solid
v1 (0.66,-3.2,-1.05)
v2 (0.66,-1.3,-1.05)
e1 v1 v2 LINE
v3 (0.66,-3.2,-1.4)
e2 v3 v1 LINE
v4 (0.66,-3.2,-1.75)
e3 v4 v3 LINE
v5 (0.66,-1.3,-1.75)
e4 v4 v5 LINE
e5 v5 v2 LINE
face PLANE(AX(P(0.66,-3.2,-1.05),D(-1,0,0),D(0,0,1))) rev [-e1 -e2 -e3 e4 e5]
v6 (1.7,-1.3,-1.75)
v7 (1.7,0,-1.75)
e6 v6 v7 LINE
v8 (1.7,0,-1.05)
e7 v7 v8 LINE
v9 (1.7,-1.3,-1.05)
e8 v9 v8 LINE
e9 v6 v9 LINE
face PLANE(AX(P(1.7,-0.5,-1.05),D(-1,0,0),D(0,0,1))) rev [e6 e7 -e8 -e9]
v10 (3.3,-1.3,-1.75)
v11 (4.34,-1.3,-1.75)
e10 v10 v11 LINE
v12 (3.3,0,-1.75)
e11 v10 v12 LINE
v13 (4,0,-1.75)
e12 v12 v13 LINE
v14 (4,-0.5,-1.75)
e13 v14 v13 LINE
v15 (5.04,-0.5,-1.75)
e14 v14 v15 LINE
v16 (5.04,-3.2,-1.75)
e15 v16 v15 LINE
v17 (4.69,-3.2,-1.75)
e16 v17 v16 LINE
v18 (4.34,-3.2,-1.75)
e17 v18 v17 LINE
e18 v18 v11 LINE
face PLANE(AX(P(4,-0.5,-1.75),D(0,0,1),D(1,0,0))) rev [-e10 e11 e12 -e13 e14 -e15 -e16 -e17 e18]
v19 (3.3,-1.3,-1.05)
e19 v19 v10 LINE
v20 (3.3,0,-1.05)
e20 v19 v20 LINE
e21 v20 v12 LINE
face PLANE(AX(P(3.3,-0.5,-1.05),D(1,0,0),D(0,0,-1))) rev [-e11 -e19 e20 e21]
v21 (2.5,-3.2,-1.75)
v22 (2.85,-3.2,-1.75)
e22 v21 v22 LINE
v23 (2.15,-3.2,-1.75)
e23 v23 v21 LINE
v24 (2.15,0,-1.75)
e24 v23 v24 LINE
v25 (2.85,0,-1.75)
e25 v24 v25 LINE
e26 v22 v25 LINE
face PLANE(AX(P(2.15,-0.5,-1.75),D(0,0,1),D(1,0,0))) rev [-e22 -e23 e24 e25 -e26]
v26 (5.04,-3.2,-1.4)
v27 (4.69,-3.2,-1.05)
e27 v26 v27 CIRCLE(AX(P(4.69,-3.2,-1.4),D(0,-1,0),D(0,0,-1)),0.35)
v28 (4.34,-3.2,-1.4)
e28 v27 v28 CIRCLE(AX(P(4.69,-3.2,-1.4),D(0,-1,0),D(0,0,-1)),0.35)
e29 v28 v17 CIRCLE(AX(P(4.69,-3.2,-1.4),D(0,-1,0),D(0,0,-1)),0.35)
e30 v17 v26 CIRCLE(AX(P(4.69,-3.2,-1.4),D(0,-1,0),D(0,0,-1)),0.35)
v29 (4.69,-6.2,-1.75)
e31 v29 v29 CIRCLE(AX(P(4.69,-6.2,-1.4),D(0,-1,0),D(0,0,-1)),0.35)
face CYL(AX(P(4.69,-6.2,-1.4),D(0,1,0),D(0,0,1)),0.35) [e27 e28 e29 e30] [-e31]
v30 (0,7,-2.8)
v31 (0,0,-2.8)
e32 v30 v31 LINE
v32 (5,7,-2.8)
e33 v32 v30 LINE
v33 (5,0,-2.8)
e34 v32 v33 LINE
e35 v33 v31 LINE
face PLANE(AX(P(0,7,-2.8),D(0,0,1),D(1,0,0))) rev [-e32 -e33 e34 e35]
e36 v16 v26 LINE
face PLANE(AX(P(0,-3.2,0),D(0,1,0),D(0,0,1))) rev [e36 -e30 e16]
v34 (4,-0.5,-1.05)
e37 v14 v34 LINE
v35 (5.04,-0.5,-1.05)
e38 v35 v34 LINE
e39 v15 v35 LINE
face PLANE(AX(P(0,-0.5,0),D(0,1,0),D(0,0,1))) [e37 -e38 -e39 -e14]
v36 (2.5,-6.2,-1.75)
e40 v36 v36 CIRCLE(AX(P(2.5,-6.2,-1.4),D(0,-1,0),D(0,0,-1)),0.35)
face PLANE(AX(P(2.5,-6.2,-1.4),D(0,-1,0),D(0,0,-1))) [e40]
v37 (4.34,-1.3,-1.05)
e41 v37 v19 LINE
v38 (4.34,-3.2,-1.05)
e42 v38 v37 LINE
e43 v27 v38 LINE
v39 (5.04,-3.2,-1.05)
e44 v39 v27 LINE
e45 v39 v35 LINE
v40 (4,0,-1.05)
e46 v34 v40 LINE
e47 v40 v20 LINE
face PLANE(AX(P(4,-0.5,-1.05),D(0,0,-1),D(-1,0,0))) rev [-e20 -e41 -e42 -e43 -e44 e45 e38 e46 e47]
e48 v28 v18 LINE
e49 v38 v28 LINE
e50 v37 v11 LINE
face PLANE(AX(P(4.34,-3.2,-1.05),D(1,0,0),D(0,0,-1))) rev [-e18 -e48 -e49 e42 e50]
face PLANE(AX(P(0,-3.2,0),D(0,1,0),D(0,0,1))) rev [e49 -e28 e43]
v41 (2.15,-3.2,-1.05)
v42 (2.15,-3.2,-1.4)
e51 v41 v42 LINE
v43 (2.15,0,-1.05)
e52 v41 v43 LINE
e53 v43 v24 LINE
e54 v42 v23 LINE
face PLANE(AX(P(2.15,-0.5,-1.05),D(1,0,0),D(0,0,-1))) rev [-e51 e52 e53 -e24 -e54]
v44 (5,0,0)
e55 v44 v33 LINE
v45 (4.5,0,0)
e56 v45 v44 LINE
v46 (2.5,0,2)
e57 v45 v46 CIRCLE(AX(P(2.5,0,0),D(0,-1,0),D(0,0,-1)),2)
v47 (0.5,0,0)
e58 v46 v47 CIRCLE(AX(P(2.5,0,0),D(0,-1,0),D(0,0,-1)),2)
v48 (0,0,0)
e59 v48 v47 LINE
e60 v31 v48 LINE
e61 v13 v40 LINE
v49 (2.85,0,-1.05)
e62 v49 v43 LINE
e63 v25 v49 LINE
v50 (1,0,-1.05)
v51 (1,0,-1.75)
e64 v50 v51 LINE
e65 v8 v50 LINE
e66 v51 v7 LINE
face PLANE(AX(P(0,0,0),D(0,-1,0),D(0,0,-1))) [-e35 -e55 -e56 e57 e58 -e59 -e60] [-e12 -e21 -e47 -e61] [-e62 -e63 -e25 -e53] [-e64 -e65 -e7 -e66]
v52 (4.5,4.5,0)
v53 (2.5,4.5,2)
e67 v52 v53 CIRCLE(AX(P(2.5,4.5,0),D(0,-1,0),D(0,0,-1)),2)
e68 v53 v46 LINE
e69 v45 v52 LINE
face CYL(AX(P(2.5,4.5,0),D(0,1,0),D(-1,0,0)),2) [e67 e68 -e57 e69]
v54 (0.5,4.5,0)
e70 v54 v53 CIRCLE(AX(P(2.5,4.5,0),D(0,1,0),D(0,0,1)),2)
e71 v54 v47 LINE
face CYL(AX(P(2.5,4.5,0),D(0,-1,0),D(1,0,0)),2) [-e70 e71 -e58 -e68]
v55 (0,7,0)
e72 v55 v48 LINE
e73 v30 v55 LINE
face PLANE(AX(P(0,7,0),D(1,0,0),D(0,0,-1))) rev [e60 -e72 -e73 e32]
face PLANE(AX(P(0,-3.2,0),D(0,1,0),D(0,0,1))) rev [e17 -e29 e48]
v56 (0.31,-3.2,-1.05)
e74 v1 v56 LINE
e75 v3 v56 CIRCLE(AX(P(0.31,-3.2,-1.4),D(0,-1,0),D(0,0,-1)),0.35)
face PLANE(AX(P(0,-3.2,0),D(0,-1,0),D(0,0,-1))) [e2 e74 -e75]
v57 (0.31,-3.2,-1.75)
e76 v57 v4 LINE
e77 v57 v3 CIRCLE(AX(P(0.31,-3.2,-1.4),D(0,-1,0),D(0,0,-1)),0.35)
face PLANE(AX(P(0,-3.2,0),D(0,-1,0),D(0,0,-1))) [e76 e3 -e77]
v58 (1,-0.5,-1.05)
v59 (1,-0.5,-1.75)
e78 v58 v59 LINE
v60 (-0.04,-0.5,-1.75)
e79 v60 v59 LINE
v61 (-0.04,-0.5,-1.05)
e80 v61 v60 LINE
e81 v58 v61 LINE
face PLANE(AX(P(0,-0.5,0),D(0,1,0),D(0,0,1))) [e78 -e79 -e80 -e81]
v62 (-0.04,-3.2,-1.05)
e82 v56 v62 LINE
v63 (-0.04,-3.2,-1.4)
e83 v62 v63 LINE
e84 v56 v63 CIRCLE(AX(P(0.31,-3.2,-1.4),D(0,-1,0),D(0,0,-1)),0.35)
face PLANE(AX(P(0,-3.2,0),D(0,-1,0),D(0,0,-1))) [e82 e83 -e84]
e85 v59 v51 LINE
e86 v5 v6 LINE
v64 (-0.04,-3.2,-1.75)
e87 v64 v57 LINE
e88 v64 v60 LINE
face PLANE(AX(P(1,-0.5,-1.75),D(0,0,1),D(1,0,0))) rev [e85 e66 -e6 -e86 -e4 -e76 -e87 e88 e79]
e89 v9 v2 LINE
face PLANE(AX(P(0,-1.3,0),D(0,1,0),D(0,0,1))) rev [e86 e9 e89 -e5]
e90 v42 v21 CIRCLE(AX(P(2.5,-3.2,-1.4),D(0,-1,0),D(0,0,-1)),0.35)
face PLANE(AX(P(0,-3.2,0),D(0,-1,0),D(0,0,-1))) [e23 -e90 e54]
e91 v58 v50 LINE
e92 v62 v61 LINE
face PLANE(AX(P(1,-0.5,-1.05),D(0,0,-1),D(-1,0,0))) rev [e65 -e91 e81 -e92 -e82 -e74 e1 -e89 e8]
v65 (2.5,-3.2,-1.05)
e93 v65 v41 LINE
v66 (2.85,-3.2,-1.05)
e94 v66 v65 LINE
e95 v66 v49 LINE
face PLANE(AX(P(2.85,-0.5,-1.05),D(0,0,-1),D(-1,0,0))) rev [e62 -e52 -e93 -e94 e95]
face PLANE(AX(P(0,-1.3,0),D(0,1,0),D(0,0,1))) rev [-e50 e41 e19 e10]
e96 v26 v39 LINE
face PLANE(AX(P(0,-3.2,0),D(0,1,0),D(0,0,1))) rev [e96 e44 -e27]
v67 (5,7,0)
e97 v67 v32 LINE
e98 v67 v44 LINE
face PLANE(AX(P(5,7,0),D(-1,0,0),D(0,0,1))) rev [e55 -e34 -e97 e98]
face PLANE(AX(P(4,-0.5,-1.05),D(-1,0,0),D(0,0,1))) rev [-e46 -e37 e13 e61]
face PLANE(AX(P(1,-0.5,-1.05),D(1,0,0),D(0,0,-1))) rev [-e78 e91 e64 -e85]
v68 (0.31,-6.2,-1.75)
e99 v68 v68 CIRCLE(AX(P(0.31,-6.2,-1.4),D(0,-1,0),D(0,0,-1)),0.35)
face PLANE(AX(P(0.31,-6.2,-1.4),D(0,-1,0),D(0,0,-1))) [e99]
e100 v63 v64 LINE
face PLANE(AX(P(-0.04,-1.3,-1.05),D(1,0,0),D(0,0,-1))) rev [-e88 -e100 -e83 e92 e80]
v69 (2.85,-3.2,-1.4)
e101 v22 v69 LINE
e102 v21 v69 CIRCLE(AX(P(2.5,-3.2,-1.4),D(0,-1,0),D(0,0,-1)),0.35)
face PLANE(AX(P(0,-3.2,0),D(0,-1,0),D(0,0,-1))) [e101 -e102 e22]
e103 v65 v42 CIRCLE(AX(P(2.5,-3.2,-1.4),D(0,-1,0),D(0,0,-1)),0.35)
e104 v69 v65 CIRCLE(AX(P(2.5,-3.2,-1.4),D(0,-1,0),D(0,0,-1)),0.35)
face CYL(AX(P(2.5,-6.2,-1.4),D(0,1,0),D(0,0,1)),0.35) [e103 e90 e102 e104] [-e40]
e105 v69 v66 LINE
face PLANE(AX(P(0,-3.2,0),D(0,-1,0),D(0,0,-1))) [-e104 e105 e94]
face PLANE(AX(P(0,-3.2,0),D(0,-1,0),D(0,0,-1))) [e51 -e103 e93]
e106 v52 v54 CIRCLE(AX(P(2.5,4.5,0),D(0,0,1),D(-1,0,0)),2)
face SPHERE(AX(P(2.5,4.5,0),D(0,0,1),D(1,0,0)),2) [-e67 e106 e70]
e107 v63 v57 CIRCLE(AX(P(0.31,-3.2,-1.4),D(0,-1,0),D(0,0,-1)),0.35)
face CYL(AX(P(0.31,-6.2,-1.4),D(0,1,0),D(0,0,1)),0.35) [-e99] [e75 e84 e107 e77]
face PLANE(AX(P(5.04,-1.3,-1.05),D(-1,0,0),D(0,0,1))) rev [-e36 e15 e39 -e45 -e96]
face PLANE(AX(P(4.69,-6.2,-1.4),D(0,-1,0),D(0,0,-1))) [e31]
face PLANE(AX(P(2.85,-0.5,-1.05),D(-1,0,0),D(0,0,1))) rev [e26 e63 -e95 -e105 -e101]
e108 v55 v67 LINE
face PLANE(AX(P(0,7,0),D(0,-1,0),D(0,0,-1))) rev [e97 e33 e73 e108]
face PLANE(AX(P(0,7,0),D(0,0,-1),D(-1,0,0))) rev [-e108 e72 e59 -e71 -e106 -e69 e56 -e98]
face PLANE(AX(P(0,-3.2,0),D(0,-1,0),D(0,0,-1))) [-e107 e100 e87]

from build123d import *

# Parameters (mm, degrees)
SCHIZZO1_W                   = 5
SCHIZZO1_H                   = 2.8
ESTRUSIONE_ESTRUSIONE1_DEPTH = 7
ESTRUSIONE_ESTRUSIONE2_DEPTH = 2
RACCORDO1_R                  = 2
SCHIZZO3_W                   = 0.7
SCHIZZO3_H                   = 0.7
ESTRUSIONE_ESTRUSIONE3_DEPTH = 0.5
SCHIZZO4_W                   = 1.74
SCHIZZO4_H                   = 0.7
SCHIZZO4_W_2                 = 0.7
ESTRUSIONE_ESTRUSIONE4_DEPTH = 0.8
SCHIZZO5_W                   = 0.7
SCHIZZO5_H                   = 0.7
ESTRUSIONE_ESTRUSIONE5_DEPTH = 1.9
SCHIZZO6_R                   = 0.35
ESTRUSIONE_ESTRUSIONE6_DEPTH = 3


with BuildPart() as part:
    # Schizzo1 → Estrusione-Estrusione1 (new body)
    with BuildSketch(Plane(origin=(0, 0, 0), x_dir=(1, 0, 0), z_dir=(0, 1, 0))):
        with Locations((2.5, 1.4)):
            Rectangle(SCHIZZO1_W, SCHIZZO1_H)
    extrude(amount=ESTRUSIONE_ESTRUSIONE1_DEPTH)

    # Schizzo2 → Estrusione-Estrusione2 (add)
    with BuildSketch(Plane.XY):
        with BuildLine():
            Line((0.5, 0), (4.5, 0))
            Line((4.5, 0), (4.5, 4.5))
            ThreePointArc((4.5, 4.5), (2.5, 6.5), (0.5, 4.5))
            Line((0.5, 4.5), (0.5, 0))
        make_face()
    extrude(amount=ESTRUSIONE_ESTRUSIONE2_DEPTH)

    # Raccordo1
    raccordo1_edges = [part.edges().sort_by_distance(p)[0] for p in [
        (4.5, 2.25, 2),
        (0.5, 2.25, 2),
        (2.5, 6.5, 2),
    ]]
    fillet(raccordo1_edges, radius=RACCORDO1_R - 0.0001)  # a hair under: the kernel refuses the full size

    # Schizzo3 → Estrusione-Estrusione3 (add)
    with BuildSketch(Plane(origin=(0, 0, 0), x_dir=(-1, 0, 0), z_dir=(0, -1, 0))):
        with Locations((-1.35, 1.4)):
            Rectangle(SCHIZZO3_W, SCHIZZO3_H)
        with Locations((-2.5, 1.4)):
            Rectangle(SCHIZZO3_W, SCHIZZO3_H)
        with Locations((-3.65, 1.4)):
            Rectangle(SCHIZZO3_W, SCHIZZO3_H)
    extrude(amount=ESTRUSIONE_ESTRUSIONE3_DEPTH)

    # Schizzo4 → Estrusione-Estrusione4 (add)
    with BuildSketch(Plane(origin=(0, -0.5, 0), x_dir=(-1, 0, 0), z_dir=(0, -1, 0))):
        with Locations((-0.83, 1.4)):
            Rectangle(SCHIZZO4_W, SCHIZZO4_H)
        with Locations((-2.5, 1.4)):
            Rectangle(SCHIZZO4_W_2, SCHIZZO4_H)
        with Locations((-4.17, 1.4)):
            Rectangle(SCHIZZO4_W, SCHIZZO4_H)
    extrude(amount=ESTRUSIONE_ESTRUSIONE4_DEPTH)

    # Schizzo5 → Estrusione-Estrusione5 (add)
    with BuildSketch(Plane.XZ.offset(1.3)):
        with Locations((0.31, -1.4)):
            Rectangle(SCHIZZO5_W, SCHIZZO5_H)
        with Locations((4.69, -1.4)):
            Rectangle(SCHIZZO5_W, SCHIZZO5_H)
        with Locations((2.5, -1.4)):
            Rectangle(SCHIZZO5_W, SCHIZZO5_H)
    extrude(amount=ESTRUSIONE_ESTRUSIONE5_DEPTH)

    # Schizzo6 → Estrusione-Estrusione6 (add)
    with BuildSketch(Plane.XZ.offset(3.2)):
        with Locations(Location((0.31, -1.4, 0), (0, 0, 270))):
            Circle(SCHIZZO6_R)
        with Locations(Location((2.5, -1.4, 0), (0, 0, 270))):
            Circle(SCHIZZO6_R)
        with Locations(Location((4.69, -1.4, 0), (0, 0, 270))):
            Circle(SCHIZZO6_R)
    extrude(amount=ESTRUSIONE_ESTRUSIONE6_DEPTH)


solid = part.part
